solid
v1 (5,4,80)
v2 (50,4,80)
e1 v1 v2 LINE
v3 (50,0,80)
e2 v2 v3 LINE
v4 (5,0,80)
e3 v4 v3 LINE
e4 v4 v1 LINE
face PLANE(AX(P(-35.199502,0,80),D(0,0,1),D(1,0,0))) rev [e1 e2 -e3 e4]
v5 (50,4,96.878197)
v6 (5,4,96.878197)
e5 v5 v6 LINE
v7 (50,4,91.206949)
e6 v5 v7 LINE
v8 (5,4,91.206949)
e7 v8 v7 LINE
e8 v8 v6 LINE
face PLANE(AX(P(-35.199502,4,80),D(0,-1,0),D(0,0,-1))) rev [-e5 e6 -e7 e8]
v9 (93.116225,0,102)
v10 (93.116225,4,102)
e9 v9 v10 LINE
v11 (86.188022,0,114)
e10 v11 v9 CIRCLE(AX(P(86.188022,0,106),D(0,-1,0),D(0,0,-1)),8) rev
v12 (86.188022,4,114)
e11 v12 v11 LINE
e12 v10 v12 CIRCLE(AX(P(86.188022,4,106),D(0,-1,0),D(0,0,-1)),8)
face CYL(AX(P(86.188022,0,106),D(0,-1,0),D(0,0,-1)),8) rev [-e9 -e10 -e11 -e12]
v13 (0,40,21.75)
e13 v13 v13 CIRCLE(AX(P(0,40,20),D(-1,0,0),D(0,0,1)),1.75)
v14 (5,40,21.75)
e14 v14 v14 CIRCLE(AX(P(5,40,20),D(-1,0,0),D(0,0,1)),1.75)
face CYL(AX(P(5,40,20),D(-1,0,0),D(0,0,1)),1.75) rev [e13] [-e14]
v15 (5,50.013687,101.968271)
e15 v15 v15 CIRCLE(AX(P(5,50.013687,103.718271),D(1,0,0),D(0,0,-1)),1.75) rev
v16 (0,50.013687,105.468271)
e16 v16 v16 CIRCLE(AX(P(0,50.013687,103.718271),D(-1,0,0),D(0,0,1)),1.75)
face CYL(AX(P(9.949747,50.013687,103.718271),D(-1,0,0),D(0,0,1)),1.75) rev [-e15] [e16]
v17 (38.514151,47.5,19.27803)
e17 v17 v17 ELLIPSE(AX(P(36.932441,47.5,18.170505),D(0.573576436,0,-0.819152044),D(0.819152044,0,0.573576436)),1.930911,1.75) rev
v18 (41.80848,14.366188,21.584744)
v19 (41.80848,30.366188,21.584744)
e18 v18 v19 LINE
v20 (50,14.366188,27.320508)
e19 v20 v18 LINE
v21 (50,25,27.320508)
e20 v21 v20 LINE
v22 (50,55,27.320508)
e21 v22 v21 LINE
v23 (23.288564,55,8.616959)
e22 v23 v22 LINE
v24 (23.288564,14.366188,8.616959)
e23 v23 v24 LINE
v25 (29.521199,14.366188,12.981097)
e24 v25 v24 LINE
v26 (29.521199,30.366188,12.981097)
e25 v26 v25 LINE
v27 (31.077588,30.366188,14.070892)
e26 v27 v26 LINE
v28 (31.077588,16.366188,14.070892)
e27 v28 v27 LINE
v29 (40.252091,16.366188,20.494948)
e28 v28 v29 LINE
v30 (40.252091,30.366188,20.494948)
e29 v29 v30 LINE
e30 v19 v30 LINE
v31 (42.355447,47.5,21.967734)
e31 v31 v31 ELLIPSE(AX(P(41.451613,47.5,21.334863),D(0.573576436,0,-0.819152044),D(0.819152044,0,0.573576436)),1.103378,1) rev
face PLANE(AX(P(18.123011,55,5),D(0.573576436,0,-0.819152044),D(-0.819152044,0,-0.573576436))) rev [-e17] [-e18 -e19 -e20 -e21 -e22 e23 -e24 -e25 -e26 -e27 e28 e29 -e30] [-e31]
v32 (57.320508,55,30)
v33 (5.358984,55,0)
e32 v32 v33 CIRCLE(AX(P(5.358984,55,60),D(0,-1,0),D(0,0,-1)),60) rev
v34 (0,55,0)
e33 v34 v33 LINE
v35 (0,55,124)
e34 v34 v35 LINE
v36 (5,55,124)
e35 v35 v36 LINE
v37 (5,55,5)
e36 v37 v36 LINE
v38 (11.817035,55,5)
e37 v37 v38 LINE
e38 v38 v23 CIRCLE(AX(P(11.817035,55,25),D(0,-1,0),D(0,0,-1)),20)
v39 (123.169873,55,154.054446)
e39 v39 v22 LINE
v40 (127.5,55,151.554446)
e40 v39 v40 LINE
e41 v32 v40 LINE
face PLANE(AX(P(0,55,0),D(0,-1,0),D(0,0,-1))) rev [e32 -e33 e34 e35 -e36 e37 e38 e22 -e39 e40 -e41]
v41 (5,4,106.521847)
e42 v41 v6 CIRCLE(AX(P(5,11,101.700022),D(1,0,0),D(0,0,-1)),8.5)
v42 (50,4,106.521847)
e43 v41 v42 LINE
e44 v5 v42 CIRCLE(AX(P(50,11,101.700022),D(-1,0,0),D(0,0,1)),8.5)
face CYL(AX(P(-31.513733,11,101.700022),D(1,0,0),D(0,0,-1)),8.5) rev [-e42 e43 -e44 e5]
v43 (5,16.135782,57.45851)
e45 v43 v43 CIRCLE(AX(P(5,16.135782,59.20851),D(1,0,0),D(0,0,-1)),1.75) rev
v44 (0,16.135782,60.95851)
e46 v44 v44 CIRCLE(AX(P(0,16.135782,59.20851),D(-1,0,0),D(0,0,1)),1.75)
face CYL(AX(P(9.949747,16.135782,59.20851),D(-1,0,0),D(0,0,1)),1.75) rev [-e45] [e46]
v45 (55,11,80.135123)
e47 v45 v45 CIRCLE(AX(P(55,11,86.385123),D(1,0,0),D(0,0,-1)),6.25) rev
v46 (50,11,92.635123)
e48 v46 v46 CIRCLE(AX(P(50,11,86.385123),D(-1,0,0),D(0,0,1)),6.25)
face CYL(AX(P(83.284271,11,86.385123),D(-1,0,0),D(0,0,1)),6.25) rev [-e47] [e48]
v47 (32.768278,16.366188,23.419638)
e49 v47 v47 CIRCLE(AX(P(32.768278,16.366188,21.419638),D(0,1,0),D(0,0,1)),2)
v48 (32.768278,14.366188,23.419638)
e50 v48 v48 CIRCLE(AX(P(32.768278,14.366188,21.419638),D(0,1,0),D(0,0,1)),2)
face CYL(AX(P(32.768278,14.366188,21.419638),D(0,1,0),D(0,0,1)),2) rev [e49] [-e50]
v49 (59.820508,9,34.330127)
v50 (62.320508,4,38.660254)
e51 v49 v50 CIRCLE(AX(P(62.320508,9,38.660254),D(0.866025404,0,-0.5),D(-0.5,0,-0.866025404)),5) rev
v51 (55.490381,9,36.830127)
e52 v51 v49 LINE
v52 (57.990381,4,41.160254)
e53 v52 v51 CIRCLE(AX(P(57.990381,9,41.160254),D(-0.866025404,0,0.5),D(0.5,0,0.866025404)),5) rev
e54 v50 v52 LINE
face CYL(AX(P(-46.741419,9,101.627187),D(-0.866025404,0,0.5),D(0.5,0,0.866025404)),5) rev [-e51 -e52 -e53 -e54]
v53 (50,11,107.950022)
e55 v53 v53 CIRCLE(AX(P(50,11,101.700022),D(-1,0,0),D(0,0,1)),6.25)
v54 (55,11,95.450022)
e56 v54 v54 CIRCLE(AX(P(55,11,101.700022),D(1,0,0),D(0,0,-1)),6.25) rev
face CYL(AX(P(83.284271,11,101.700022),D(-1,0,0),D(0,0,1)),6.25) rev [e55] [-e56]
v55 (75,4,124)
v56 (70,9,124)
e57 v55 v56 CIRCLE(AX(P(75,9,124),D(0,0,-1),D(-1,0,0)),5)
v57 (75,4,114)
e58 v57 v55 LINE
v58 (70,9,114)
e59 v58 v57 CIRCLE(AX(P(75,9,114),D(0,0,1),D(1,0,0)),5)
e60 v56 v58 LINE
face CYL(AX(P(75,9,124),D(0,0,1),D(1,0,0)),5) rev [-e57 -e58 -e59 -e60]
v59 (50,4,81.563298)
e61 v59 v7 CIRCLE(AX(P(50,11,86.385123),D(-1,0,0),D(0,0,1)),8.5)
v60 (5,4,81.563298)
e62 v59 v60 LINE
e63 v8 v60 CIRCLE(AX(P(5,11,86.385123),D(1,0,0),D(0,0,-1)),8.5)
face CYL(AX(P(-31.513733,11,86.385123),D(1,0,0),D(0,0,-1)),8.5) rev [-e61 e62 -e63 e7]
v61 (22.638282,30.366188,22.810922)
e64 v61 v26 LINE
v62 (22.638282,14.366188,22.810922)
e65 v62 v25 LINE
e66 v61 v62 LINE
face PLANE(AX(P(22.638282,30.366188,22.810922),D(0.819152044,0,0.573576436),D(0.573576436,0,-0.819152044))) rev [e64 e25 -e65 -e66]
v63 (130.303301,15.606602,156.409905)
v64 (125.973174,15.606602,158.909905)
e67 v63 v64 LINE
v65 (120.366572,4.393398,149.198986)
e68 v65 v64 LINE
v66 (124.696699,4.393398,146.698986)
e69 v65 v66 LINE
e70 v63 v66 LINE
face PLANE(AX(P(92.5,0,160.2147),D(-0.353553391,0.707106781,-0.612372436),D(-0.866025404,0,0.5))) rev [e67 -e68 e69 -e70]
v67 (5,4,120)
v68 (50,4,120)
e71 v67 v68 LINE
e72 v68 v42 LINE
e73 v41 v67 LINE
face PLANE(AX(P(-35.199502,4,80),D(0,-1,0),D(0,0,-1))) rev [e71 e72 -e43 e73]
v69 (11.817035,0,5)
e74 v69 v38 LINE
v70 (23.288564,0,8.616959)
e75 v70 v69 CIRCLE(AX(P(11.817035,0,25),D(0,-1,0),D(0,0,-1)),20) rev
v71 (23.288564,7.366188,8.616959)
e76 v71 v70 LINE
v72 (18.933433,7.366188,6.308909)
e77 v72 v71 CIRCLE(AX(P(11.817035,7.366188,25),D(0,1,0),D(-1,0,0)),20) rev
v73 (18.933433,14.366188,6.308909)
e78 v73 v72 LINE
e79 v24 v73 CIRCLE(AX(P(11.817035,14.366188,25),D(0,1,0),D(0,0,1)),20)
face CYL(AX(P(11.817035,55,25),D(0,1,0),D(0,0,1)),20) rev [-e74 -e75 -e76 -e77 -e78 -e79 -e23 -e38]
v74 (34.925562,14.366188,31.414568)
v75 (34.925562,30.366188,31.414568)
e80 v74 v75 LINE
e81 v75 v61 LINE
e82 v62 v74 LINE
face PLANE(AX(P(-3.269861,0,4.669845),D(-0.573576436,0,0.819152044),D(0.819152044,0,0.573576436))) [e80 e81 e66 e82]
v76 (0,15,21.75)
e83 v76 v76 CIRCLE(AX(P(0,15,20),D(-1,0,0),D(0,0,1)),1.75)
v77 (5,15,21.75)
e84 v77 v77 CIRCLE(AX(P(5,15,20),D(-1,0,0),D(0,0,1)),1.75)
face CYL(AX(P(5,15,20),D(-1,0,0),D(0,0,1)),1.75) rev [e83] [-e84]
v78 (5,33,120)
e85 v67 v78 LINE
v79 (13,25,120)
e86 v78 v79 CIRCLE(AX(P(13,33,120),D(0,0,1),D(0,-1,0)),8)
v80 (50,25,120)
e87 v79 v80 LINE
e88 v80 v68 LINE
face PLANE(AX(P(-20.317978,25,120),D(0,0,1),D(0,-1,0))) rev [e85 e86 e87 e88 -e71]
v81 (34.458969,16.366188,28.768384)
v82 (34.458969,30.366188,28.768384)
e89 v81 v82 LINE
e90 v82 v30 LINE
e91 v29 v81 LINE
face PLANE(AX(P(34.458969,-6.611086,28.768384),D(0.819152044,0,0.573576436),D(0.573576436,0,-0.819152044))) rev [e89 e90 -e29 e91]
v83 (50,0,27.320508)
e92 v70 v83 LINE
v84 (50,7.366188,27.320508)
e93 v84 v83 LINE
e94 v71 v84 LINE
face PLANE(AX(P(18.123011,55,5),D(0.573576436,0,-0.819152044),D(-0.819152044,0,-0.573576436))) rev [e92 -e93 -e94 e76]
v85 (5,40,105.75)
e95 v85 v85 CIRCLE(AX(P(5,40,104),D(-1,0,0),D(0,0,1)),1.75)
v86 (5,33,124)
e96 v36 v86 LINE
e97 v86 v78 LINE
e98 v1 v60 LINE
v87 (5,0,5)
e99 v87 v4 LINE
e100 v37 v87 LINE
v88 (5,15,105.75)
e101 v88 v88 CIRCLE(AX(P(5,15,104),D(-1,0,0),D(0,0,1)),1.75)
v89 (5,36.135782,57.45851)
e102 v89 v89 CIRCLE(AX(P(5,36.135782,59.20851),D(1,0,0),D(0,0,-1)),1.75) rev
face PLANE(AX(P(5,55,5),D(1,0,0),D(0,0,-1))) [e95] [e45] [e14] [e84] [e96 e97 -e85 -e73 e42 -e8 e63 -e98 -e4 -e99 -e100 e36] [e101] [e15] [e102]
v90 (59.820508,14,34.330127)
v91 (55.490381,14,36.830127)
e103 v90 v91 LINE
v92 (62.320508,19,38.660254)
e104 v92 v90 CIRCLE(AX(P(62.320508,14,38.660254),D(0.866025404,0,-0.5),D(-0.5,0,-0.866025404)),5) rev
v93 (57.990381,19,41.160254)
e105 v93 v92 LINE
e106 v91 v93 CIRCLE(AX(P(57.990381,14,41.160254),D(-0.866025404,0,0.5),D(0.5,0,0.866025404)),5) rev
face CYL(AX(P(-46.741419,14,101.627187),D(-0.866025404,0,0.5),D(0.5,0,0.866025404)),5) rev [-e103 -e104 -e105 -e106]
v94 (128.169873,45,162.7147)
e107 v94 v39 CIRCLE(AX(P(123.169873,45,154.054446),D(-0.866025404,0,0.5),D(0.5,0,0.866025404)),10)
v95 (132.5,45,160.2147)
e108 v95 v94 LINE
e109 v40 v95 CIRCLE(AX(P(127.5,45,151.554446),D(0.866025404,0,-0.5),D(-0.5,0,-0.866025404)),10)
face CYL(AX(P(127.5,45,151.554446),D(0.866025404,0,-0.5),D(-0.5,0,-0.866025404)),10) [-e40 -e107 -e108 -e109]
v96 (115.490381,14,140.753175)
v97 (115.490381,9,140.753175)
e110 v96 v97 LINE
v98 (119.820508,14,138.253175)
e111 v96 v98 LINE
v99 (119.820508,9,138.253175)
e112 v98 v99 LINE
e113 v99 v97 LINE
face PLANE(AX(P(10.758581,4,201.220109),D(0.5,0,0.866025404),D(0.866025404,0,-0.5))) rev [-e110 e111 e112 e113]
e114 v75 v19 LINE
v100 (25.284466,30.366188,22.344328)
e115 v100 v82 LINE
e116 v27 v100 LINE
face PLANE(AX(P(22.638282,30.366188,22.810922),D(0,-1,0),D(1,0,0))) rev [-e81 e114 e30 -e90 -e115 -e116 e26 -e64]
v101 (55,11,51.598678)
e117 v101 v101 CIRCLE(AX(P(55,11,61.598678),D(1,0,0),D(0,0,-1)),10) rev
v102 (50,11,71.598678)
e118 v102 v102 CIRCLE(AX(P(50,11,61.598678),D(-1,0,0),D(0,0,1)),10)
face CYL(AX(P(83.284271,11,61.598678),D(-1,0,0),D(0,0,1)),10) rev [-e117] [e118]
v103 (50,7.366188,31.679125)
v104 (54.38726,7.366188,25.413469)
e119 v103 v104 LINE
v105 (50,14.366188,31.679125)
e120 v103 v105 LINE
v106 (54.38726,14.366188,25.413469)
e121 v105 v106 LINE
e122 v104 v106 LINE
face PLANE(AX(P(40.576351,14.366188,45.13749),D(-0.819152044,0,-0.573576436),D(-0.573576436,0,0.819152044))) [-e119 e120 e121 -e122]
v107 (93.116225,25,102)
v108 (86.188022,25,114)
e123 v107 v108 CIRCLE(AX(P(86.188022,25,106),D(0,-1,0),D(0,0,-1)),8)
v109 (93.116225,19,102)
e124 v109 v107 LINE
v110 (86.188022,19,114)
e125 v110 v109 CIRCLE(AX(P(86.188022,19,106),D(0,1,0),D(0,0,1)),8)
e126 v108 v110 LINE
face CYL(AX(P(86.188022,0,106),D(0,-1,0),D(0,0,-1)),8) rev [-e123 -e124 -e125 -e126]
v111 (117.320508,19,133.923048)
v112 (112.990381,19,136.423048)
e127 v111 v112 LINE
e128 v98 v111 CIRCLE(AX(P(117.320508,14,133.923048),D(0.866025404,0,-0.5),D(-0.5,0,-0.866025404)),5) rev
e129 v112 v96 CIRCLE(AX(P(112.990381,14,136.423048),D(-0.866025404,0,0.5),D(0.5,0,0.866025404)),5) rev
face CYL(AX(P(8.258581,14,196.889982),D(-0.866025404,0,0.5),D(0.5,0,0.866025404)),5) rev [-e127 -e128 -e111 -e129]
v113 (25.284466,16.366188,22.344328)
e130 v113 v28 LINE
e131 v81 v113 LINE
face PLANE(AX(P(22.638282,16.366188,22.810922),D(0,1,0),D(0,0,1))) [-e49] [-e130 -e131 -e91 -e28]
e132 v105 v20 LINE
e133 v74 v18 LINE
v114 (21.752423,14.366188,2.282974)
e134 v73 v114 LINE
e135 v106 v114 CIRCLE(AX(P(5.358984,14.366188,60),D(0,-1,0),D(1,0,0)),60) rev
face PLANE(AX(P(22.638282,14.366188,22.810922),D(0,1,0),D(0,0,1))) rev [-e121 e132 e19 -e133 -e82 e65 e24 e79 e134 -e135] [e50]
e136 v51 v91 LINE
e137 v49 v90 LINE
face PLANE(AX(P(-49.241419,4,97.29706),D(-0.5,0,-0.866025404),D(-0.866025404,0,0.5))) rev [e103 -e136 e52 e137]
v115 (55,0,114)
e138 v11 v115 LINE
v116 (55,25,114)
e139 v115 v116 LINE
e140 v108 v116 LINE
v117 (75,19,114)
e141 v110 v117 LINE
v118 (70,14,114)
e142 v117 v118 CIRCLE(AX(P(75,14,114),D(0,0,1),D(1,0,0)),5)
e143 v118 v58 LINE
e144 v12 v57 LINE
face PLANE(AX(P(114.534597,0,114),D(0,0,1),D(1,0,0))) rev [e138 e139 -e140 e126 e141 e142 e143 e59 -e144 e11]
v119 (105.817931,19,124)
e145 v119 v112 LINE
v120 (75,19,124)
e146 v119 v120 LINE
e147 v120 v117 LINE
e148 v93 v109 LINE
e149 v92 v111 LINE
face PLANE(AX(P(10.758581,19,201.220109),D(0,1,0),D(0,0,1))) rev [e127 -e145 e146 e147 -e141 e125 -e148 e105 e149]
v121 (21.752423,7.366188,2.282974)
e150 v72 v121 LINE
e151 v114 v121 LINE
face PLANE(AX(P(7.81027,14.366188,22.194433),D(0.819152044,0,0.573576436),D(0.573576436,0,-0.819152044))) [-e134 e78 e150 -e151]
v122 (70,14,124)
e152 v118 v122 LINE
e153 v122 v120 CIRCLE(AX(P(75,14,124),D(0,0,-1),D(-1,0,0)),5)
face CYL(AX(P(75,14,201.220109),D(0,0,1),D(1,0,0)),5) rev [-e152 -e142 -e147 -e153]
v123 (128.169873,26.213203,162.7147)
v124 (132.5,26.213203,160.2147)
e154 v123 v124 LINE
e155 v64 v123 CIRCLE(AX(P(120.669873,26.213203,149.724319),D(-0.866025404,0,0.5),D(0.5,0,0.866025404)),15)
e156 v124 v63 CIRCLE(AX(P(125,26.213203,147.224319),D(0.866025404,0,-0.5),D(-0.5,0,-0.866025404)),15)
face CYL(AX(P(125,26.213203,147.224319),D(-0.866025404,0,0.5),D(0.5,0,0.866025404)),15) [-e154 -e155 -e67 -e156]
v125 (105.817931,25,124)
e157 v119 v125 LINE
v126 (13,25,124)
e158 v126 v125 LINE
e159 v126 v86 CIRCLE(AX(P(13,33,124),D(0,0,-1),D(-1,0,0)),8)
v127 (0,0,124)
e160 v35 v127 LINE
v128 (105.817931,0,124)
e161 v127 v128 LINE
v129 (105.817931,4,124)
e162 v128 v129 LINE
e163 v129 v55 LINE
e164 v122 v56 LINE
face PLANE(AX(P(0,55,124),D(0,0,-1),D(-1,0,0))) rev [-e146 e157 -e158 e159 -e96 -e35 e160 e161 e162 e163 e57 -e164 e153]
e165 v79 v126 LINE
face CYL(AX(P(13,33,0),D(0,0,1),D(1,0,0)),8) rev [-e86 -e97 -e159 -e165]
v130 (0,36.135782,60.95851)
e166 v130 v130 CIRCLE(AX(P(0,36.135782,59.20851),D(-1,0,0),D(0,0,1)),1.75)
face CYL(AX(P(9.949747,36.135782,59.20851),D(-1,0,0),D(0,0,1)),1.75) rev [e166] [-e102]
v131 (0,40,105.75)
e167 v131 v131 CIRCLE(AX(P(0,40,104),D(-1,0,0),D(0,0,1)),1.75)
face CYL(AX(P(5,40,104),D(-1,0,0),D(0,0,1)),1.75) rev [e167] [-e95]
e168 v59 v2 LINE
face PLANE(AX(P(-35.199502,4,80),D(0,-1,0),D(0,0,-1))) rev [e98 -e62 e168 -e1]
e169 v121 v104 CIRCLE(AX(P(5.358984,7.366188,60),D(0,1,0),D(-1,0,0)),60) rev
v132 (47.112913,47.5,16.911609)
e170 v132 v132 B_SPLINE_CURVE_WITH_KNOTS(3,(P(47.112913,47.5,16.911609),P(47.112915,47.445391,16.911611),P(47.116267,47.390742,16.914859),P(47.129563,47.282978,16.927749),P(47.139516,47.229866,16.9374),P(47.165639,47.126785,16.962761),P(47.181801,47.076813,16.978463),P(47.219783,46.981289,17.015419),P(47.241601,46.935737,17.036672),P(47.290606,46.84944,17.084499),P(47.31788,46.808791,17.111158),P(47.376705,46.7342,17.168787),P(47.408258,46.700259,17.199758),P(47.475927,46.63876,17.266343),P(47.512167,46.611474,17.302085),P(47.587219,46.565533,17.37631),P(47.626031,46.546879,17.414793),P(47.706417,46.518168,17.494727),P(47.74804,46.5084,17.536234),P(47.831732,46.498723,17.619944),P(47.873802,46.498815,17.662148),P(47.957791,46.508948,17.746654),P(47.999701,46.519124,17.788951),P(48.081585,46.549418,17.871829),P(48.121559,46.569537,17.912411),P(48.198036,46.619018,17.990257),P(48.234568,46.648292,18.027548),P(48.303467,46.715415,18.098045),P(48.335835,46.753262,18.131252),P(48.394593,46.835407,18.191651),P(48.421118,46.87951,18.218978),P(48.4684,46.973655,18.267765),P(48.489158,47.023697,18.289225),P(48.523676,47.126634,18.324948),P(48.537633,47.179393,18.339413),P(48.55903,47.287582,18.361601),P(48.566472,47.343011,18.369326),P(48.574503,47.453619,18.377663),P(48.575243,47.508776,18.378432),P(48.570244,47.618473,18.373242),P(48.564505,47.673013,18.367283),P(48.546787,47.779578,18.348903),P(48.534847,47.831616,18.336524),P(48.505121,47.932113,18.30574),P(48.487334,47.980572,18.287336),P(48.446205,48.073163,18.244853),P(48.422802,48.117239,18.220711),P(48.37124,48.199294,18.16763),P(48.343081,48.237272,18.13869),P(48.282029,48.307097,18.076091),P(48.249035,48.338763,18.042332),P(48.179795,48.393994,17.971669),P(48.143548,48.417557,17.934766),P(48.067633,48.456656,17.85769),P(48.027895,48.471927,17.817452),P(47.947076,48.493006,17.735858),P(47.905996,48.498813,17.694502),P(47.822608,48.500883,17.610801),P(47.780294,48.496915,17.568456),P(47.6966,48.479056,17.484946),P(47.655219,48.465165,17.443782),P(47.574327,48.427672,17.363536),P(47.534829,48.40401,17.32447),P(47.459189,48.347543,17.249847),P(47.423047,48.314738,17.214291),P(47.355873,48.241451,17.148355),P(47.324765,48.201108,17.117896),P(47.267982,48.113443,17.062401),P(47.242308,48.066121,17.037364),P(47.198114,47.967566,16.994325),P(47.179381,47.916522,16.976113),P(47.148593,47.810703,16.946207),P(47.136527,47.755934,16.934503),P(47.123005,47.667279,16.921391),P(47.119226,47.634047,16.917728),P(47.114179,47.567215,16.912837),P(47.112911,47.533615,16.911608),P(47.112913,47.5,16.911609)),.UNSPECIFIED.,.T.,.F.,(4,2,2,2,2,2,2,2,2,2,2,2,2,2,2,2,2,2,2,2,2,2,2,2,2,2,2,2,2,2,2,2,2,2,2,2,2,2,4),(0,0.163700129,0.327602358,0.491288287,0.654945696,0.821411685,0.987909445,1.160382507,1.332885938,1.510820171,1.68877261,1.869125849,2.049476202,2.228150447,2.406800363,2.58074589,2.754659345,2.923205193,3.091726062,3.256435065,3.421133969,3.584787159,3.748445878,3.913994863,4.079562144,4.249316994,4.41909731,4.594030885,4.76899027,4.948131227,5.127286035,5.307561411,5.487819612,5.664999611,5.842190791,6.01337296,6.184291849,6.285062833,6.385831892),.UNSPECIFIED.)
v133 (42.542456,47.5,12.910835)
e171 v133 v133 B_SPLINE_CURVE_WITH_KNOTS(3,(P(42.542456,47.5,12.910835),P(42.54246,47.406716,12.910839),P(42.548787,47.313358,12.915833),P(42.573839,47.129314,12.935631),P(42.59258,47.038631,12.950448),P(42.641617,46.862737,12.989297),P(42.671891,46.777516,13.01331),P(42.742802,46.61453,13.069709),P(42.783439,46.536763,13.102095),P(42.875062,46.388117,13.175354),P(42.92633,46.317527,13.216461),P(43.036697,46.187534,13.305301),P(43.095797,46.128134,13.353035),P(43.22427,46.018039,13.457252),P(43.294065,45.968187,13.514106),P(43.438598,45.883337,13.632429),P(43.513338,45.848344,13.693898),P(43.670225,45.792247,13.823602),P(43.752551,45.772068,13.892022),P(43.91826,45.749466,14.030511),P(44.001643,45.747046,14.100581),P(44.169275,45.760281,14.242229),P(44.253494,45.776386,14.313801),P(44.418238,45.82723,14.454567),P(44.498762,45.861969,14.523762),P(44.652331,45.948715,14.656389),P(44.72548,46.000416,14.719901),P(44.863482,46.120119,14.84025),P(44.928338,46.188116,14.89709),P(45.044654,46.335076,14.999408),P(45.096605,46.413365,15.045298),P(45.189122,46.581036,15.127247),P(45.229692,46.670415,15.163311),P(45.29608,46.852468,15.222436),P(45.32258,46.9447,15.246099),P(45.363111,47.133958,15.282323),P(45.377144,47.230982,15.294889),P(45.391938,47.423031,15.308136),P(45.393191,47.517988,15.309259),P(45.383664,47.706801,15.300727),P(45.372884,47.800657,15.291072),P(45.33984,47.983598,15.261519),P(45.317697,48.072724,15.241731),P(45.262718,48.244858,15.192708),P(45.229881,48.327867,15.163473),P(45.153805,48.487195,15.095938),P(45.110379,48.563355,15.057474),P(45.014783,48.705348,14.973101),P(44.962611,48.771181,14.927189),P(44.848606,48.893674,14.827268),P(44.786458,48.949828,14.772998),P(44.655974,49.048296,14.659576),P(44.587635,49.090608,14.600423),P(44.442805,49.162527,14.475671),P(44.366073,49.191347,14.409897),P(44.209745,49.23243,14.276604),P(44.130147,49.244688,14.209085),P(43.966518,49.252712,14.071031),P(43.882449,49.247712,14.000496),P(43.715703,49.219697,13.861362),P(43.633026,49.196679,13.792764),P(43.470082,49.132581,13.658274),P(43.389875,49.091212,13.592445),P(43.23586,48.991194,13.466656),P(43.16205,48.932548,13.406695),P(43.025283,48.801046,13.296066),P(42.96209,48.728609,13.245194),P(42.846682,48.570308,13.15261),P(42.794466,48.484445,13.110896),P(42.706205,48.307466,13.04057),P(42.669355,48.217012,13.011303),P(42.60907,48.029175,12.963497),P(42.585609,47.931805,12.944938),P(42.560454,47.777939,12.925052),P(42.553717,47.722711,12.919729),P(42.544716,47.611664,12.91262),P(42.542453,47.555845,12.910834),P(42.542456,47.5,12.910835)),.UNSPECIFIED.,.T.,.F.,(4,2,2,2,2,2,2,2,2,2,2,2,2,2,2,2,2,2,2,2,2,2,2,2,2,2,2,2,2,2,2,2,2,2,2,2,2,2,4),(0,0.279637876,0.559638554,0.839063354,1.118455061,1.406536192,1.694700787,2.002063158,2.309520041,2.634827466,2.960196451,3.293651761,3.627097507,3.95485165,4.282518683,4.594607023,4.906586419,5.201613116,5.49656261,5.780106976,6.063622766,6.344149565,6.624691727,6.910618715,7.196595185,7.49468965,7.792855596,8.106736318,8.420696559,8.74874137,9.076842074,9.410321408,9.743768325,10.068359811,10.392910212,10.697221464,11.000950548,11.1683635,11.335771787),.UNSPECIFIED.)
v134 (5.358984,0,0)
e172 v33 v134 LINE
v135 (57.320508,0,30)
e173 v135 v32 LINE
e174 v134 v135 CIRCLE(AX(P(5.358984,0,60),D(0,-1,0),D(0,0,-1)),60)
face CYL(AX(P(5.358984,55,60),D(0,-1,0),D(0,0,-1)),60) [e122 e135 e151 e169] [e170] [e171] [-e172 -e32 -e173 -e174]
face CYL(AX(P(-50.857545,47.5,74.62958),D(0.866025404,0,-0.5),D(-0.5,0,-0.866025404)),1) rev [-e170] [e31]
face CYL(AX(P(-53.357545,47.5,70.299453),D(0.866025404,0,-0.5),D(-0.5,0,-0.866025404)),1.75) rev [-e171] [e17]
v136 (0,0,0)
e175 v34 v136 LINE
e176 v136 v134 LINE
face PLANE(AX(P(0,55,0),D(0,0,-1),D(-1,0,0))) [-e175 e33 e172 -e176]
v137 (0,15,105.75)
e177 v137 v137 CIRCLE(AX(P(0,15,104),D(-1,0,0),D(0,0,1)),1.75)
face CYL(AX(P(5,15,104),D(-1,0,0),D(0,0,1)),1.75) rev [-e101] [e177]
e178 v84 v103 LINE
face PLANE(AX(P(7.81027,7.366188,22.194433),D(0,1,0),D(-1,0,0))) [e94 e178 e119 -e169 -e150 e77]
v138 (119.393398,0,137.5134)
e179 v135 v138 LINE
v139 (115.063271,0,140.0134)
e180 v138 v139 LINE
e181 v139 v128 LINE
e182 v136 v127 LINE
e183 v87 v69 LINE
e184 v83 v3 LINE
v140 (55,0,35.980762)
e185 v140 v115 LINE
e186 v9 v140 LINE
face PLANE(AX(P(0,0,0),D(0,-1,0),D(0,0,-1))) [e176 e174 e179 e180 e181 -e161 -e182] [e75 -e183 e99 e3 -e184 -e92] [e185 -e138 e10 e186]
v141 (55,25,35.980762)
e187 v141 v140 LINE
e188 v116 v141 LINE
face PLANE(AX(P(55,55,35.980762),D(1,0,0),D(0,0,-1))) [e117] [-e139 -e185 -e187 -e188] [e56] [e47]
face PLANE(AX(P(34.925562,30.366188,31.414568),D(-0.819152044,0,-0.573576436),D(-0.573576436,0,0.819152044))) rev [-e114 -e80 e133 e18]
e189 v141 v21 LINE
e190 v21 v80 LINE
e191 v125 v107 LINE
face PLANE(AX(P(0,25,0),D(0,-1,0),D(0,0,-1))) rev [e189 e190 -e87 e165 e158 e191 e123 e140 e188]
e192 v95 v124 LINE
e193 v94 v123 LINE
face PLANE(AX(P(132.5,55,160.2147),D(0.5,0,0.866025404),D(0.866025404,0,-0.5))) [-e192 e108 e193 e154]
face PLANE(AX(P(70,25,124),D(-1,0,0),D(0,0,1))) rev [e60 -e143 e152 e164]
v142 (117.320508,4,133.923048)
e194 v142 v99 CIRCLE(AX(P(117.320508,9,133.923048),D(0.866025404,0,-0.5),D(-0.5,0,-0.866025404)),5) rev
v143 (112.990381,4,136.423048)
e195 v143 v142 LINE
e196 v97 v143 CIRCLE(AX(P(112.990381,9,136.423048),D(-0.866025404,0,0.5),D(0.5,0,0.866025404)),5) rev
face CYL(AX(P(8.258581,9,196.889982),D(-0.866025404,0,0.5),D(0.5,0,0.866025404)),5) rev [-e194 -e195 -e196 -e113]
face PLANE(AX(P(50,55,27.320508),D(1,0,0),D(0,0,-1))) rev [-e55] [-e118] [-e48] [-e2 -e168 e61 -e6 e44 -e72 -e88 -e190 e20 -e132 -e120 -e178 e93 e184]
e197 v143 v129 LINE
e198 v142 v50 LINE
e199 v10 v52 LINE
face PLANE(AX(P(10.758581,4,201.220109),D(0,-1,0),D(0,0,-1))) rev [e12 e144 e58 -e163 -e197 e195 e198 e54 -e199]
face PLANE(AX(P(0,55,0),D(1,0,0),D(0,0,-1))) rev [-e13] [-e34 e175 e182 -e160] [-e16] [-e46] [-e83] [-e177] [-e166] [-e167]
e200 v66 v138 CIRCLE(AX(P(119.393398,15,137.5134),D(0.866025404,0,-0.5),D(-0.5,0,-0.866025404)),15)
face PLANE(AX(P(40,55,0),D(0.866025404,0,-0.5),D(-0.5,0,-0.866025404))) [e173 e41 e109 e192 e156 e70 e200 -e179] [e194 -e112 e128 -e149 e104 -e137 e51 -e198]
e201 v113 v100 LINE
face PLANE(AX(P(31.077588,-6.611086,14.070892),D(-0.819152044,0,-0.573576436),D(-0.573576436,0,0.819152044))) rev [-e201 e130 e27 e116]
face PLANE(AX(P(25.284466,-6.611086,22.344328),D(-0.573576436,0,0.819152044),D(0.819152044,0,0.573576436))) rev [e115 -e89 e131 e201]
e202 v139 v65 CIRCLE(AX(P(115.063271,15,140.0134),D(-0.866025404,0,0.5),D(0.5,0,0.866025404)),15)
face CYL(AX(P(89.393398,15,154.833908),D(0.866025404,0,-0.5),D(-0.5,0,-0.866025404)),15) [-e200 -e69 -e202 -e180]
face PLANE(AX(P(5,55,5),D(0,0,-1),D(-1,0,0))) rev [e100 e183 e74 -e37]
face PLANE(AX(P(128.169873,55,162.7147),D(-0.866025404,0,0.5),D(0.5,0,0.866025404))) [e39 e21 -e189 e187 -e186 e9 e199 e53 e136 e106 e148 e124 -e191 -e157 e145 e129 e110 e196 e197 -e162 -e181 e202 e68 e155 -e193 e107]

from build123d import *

# Parameters (mm, degrees)
BOSS_EXTRUDE3_DEPTH     = 55
FILLET1_R               = 60
SKETCH4_W               = 15
SKETCH4_H               = 16
BOSS_EXTRUDE4_DEPTH     = 12
CUT_EXTRUDE1_DEPTH      = 20
CUT_EXTRUDE1_DEPTH_BACK = 14
SKETCH5_W               = 40
SKETCH5_H               = 7
CUT_EXTRUDE2_DEPTH      = 14
SKETCH7_R               = 2
CUT_EXTRUDE3_DEPTH      = 2
CUT_EXTRUDE4_DEPTH      = 30
SKETCH9_R               = 10
SKETCH9_R_2             = 6.25
CUT_EXTRUDE5_DEPTH      = 5
SKETCH10_W              = 120
SKETCH10_H              = 15
CUT_EXTRUDE6_DEPTH      = 5
SKETCH11_W              = 4
SKETCH11_H              = 25
BOSS_EXTRUDE5_DEPTH     = 45
FILLET3_R               = 20
BOSS_EXTRUDE6_REACH     = 190.434
SKETCH12_W              = 10
SKETCH12_H              = 4
SKETCH13_W              = 40
SKETCH13_H              = 4
BOSS_EXTRUDE7_DEPTH     = 45
FILLET4_R               = 5
CUT_EXTRUDE7_DEPTH      = 45
SKETCH16_R              = 1.75
CUT_EXTRUDE8_DEPTH      = 5
SKETCH15_R              = 1.75
CUT_EXTRUDE9_DEPTH      = 5
CUT_EXTRUDE10_REACH     = 216.345
SKETCH17_R              = 1.75
SKETCH17_R_2            = 1
CHAMFER1_SIZE           = 20
FILLET6_R               = 15
FILLET7_R               = 10
SKETCH18_W              = 15
SKETCH18_H              = 10
BOSS_EXTRUDE8_DEPTH     = 21
SKETCH19_W              = 10
SKETCH19_H              = 6
BOSS_EXTRUDE9_DEPTH     = 35.817931
FILLET9_R               = 5
FILLET10_R              = 8
FILLET11_R              = 8


with BuildPart() as part:
    # Sketch3 → Boss-Extrude3 (new body)
    with BuildSketch(Plane(origin=(0, 0, 0), x_dir=(1, 0, 0), z_dir=(0, 1, 0))):
        Polygon((128.169872981, -162.7146997), (55, -35.980762114), (55, -124), (50, -124), (50, -27.320508076), (18.123010882, -5), (5, -5), (5, -124), (0, -124), (0, 0), (40, 0), (132.5, -160.2146997), align=None)
    extrude(amount=BOSS_EXTRUDE3_DEPTH)

    # Fillet1
    fillet1_edges = [part.edges().sort_by_distance(p)[0] for p in [
        (40, 27.5, 0),
    ]]
    fillet(fillet1_edges, radius=FILLET1_R)

    # Sketch4 → Boss-Extrude4 (add)
    with BuildSketch(Plane(origin=(3.613056499, 0, -5.159979438), x_dir=(0.8191520442889911, 0, 0.5735764363510469), z_dir=(-0.5735764363510469, 0, 0.8191520442889911))):
        with Locations((39.128001876, 22.366188336)):
            Rectangle(SKETCH4_W, SKETCH4_H)
    extrude(amount=BOSS_EXTRUDE4_DEPTH)

    # Sketch5 → Cut-Extrude1 (cut, two sides: drawn at the far end of the back side and taken through both)
    with BuildSketch(Plane(origin=(3.613056499, 0, -5.159979438), x_dir=(0.8191520442889911, 0, 0.5735764363510469), z_dir=(-0.5735764363510469, 0, 0.8191520442889911)).offset(-CUT_EXTRUDE1_DEPTH_BACK)):
        with Locations((39.128001876, 10.866188336)):
            Rectangle(SKETCH5_W, SKETCH5_H)
    extrude(amount=CUT_EXTRUDE1_DEPTH + CUT_EXTRUDE1_DEPTH_BACK, mode=Mode.SUBTRACT)

    # Sketch6 → Cut-Extrude2 (cut)
    with BuildSketch(Plane(origin=(0, 30.366188336, 0), x_dir=(1, 0, 0), z_dir=(0, 1, 0))):
        Polygon((31.077587777, -14.070892396), (25.28446577, -22.344328043), (34.458968666, -28.76838413), (40.252090673, -20.494948483), align=None)
    extrude(amount=-CUT_EXTRUDE2_DEPTH, mode=Mode.SUBTRACT)

    # Sketch7 → Cut-Extrude3 (cut)
    with BuildSketch(Plane(origin=(0, 16.366188336, 0), x_dir=(1, 0, 0), z_dir=(0, 1, 0))):
        with Locations(Location((32.768278221, -21.419638263, 0), (0, 0, 270))):
            Circle(SKETCH7_R)
    extrude(amount=-CUT_EXTRUDE3_DEPTH, mode=Mode.SUBTRACT)

    # Sketch8 → Cut-Extrude4 (cut)
    with BuildSketch(Plane(origin=(0, 55, 0), x_dir=(1, 0, 0), z_dir=(0, 1, 0))):
        Polygon((55, -35.980762114), (50, -27.320508076), (50, -124), (55, -124), align=None)
    extrude(amount=-CUT_EXTRUDE4_DEPTH, mode=Mode.SUBTRACT)

    # Sketch9 → Cut-Extrude5 (cut)
    with BuildSketch(Plane.ZY.offset(-50)):
        with Locations((61.598678321, 11)):
            Circle(SKETCH9_R)
        with Locations((86.385123427, 11)):
            Circle(SKETCH9_R_2)
        with Locations((101.700022006, 11)):
            Circle(SKETCH9_R_2)
    extrude(amount=-CUT_EXTRUDE5_DEPTH, mode=Mode.SUBTRACT)

    # Sketch10 → Cut-Extrude6 (cut)
    with BuildSketch(Plane(origin=(30, 0, -17.320508076), x_dir=(-0.5000000000000047, 0, -0.866025403784436), z_dir=(0.866025403784436, 0, -0.5000000000000047))):
        with Locations((-119.641016151, 11.5)):
            Rectangle(SKETCH10_W, SKETCH10_H)
    extrude(amount=-CUT_EXTRUDE6_DEPTH, mode=Mode.SUBTRACT)

    # Sketch11 → Boss-Extrude5 (add)
    with BuildSketch(Plane.ZY.offset(-50)):
        with Locations((122, 12.5)):
            Rectangle(SKETCH11_W, SKETCH11_H)
    extrude(amount=BOSS_EXTRUDE5_DEPTH)

    # Fillet3
    # the kernel refuses this fillet: 20 mm, written as the material it adds along each edge
    with BuildSketch(Plane(origin=(18.123010882, 0, 5), x_dir=(-1, 0, 0), z_dir=(0, 1, 0))) as fillet3_piece_1_section:
        with BuildLine():
            CenterArc((FILLET3_R * 0.315298788879, FILLET3_R), FILLET3_R, 235, 35)
            Line((-FILLET3_R * 0.258277647472, FILLET3_R * 0.180847955711), (0, 0))
            Line((0, 0), (FILLET3_R * 0.315298788879, 0))
        make_face()
    fillet3_piece_1 = extrude(amount=55, mode=Mode.PRIVATE)
    fillet3_piece_1 = split(fillet3_piece_1, bisect_by=Plane(origin=(18.647698148, 3.683094168, 6.716980636), z_dir=(-0.8191520442889912, 0, -0.5735764363510469)), keep=Keep.TOP, mode=Mode.PRIVATE)
    fillet3_piece_1 = split(fillet3_piece_1, bisect_by=Plane(origin=(16.403340896, 7.366188336, 5.14546477), z_dir=(0, -1, 0)), keep=Keep.TOP, mode=Mode.PRIVATE)
    add(fillet3_piece_1)
    with BuildSketch(Plane(origin=(18.123010882, 0, 5), x_dir=(-1, 0, 0), z_dir=(0, 1, 0))) as fillet3_piece_2_section:
        with BuildLine():
            CenterArc((FILLET3_R * 0.315298788879, FILLET3_R), FILLET3_R, 235, 35)
            Line((-FILLET3_R * 0.258277647472, FILLET3_R * 0.180847955711), (0, 0))
            Line((0, 0), (FILLET3_R * 0.315298788879, 0))
        make_face()
    fillet3_piece_2 = extrude(amount=55, mode=Mode.PRIVATE)
    fillet3_piece_2 = split(fillet3_piece_2, bisect_by=Plane(origin=(19.32323837, 3.683094168, 5.752209215), z_dir=(0.8191520442889912, 0, 0.5735764363510469)), keep=Keep.TOP, mode=Mode.PRIVATE)
    fillet3_piece_2 = split(fillet3_piece_2, bisect_by=Plane(origin=(20.990357579, 7.366188336, 6.919538653), z_dir=(0, -1, 0)), keep=Keep.TOP, mode=Mode.PRIVATE)
    add(fillet3_piece_2)
    with BuildSketch(Plane(origin=(18.123010882, 0, 5), x_dir=(-1, 0, 0), z_dir=(0, 1, 0))) as fillet3_piece_3_section:
        with BuildLine():
            CenterArc((FILLET3_R * 0.315298788879, FILLET3_R), FILLET3_R, 235, 35)
            Line((-FILLET3_R * 0.258277647472, FILLET3_R * 0.180847955711), (0, 0))
            Line((0, 0), (FILLET3_R * 0.315298788879, 0))
        make_face()
    fillet3_piece_3 = extrude(amount=55, mode=Mode.PRIVATE)
    fillet3_piece_3 = split(fillet3_piece_3, bisect_by=Plane(origin=(16.403340896, 14.366188336, 5.14546477), z_dir=(0, -1, 0)), keep=Keep.TOP, mode=Mode.PRIVATE)
    fillet3_piece_3 = split(fillet3_piece_3, bisect_by=Plane(origin=(18.647698148, 10.866188336, 6.716980636), z_dir=(-0.8191520442889912, 0, -0.5735764363510469)), keep=Keep.TOP, mode=Mode.PRIVATE)
    fillet3_piece_3 = split(fillet3_piece_3, bisect_by=Plane(origin=(16.403340896, 7.366188336, 5.14546477), z_dir=(0, 1, 0)), keep=Keep.TOP, mode=Mode.PRIVATE)
    add(fillet3_piece_3)
    with BuildSketch(Plane(origin=(18.123010882, 0, 5), x_dir=(-1, 0, 0), z_dir=(0, 1, 0))) as fillet3_piece_4_section:
        with BuildLine():
            CenterArc((FILLET3_R * 0.315298788879, FILLET3_R), FILLET3_R, 235, 35)
            Line((-FILLET3_R * 0.258277647472, FILLET3_R * 0.180847955711), (0, 0))
            Line((0, 0), (FILLET3_R * 0.315298788879, 0))
        make_face()
    fillet3_piece_4 = extrude(amount=55, mode=Mode.PRIVATE)
    fillet3_piece_4 = split(fillet3_piece_4, bisect_by=Plane(origin=(16.403340896, 14.366188336, 5.14546477), z_dir=(0, 1, 0)), keep=Keep.TOP, mode=Mode.PRIVATE)
    fillet3_piece_4 = split(fillet3_piece_4, bisect_by=Plane(origin=(18.647698148, 34.683094168, 6.716980636), z_dir=(-0.8191520442889912, 0, -0.5735764363510469)), keep=Keep.TOP, mode=Mode.PRIVATE)
    add(fillet3_piece_4)
    with BuildSketch(Plane(origin=(18.123010882, 0, 5), x_dir=(-1, 0, 0), z_dir=(0, 1, 0))) as fillet3_piece_5_section:
        with BuildLine():
            CenterArc((FILLET3_R * 0.315298788879, FILLET3_R), FILLET3_R, 235, 35)
            Line((-FILLET3_R * 0.258277647472, FILLET3_R * 0.180847955711), (0, 0))
            Line((0, 0), (FILLET3_R * 0.315298788879, 0))
        make_face()
    fillet3_piece_5 = extrude(amount=55, mode=Mode.PRIVATE)
    fillet3_piece_5 = split(fillet3_piece_5, bisect_by=Plane(origin=(20.990357579, 14.366188336, 6.919538653), z_dir=(0, 1, 0)), keep=Keep.TOP, mode=Mode.PRIVATE)
    fillet3_piece_5 = split(fillet3_piece_5, bisect_by=Plane(origin=(19.32323837, 34.683094168, 5.752209215), z_dir=(0.8191520442889912, 0, 0.5735764363510469)), keep=Keep.TOP, mode=Mode.PRIVATE)
    add(fillet3_piece_5)

    # Boss-Extrude6: up to this plane
    boss_extrude6_end = Plane(origin=(128.169872981, 55, 162.7146997), z_dir=(-0.8660254037844362, 0, 0.5000000000000044))
    # Sketch12 → Boss-Extrude6 (add, up to the surface)
    with BuildSketch(Plane(origin=(55, 0, 0), x_dir=(0, 0, -1), z_dir=(1, 0, 0)), mode=Mode.PRIVATE) as boss_extrude6_sk1:
        with Locations((-119, 2)):
            Rectangle(SKETCH12_W, SKETCH12_H)
    boss_extrude6_tool1 = split(extrude(boss_extrude6_sk1.sketch, amount=BOSS_EXTRUDE6_REACH, mode=Mode.PRIVATE), bisect_by=boss_extrude6_end, keep=Keep.BOTH, mode=Mode.PRIVATE)
    add(boss_extrude6_tool1.solids().sort_by_distance((55, 2, 119))[0])

    # Sketch13 → Boss-Extrude7 (add)
    with BuildSketch(Plane.ZY.offset(-50)):
        with Locations((100, 2)):
            Rectangle(SKETCH13_W, SKETCH13_H)
    extrude(amount=BOSS_EXTRUDE7_DEPTH)

    # Fillet4
    fillet4_edges = [part.edges().sort_by_distance(p)[0] for p in [
        (57.655444566, 4, 35.580127019),
        (57.655444566, 19, 35.580127019),
        (117.655444566, 19, 139.503175473),
        (117.655444566, 4, 139.503175473),
    ]]
    fillet(fillet4_edges, radius=FILLET4_R)

    # Sketch14 → Cut-Extrude7 (cut)
    with BuildSketch(Plane.ZY.offset(-50)):
        with BuildLine():
            ThreePointArc((94.042572717, 14.689643665), (77.885123427, 11), (94.042572717, 7.310356335))
            ThreePointArc((94.042572717, 7.310356335), (110.200022006, 11), (94.042572717, 14.689643665))
        make_face()
    extrude(amount=CUT_EXTRUDE7_DEPTH, mode=Mode.SUBTRACT)

    # Sketch16 → Cut-Extrude8 (cut)
    with BuildSketch(Plane.ZY):
        with Locations((59.208509529, 36.135781847)):
            Circle(SKETCH16_R)
        with Locations((59.208509529, 16.135781847)):
            Circle(SKETCH16_R)
        with Locations((103.718271361, 50.013687011)):
            Circle(SKETCH16_R)
    extrude(amount=-CUT_EXTRUDE8_DEPTH, mode=Mode.SUBTRACT)

    # Sketch15 → Cut-Extrude9 (cut)
    with BuildSketch(Plane.ZY):
        with Locations((104, 40)):
            Circle(SKETCH15_R)
        with Locations((104, 15)):
            Circle(SKETCH15_R)
        with Locations((20, 15)):
            Circle(SKETCH15_R)
        with Locations((20, 40)):
            Circle(SKETCH15_R)
    extrude(amount=-CUT_EXTRUDE9_DEPTH, mode=Mode.SUBTRACT)

    # Cut-Extrude10: up to this plane
    cut_extrude10_end = Plane(origin=(18.123010882, 55, 5), z_dir=(0.5735764363510469, 0, -0.8191520442889914))
    # Sketch17 → Cut-Extrude10 (cut, up to the surface)
    with BuildSketch(Plane(origin=(30, 0, -17.320508076), x_dir=(-0.5000000000000047, 0, -0.866025403784436), z_dir=(0.866025403784436, 0, -0.5000000000000047)), mode=Mode.PRIVATE) as cut_extrude10_sk1:
        with Locations((-34.202339372, 47.5)):
            Circle(SKETCH17_R)
    cut_extrude10_tool1 = split(extrude(cut_extrude10_sk1.sketch, amount=-CUT_EXTRUDE10_REACH, mode=Mode.PRIVATE), bisect_by=cut_extrude10_end, keep=Keep.BOTH, mode=Mode.PRIVATE)
    add(cut_extrude10_tool1.solids().sort_by_distance((47.10117, 47.5, 12.299587))[0], mode=Mode.SUBTRACT)
    # Sketch17 → Cut-Extrude10 (cut, up to the surface)
    with BuildSketch(Plane(origin=(30, 0, -17.320508076), x_dir=(-0.5000000000000047, 0, -0.866025403784436), z_dir=(0.866025403784436, 0, -0.5000000000000047)), mode=Mode.PRIVATE) as cut_extrude10_sk2:
        with Locations((-39.202339372, 47.5)):
            Circle(SKETCH17_R_2)
    cut_extrude10_tool2 = split(extrude(cut_extrude10_sk2.sketch, amount=-CUT_EXTRUDE10_REACH, mode=Mode.PRIVATE), bisect_by=cut_extrude10_end, keep=Keep.BOTH, mode=Mode.PRIVATE)
    add(cut_extrude10_tool2.solids().sort_by_distance((49.60117, 47.5, 16.629714))[0], mode=Mode.SUBTRACT)

    # Chamfer1
    chamfer1_edges = [part.edges().sort_by_distance(p)[0] for p in [
        (130.334936491, 0, 161.4646997),
    ]]
    chamfer(chamfer1_edges, length=CHAMFER1_SIZE)

    # Fillet6
    fillet6_edges = [part.edges().sort_by_distance(p)[0] for p in [
        (120.334936491, 0, 144.144191624),
        (130.334936491, 20, 161.4646997),
    ]]
    fillet(fillet6_edges, radius=FILLET6_R)

    # Fillet7
    fillet7_edges = [part.edges().sort_by_distance(p)[0] for p in [
        (130.334936491, 55, 161.4646997),
    ]]
    fillet(fillet7_edges, radius=FILLET7_R)

    # Sketch18 → Boss-Extrude8 (add)
    with BuildSketch(Plane(origin=(0, 4, 0), x_dir=(1, 0, 0), z_dir=(0, 1, 0))):
        with Locations((62.5, -119)):
            Rectangle(SKETCH18_W, SKETCH18_H)
    extrude(amount=BOSS_EXTRUDE8_DEPTH)

    # Sketch19 → Boss-Extrude9 (add)
    with BuildSketch(Plane(origin=(70, 0, 0), x_dir=(0, 0, -1), z_dir=(1, 0, 0))):
        with Locations((-119, 22)):
            Rectangle(SKETCH19_W, SKETCH19_H)
    extrude(amount=BOSS_EXTRUDE9_DEPTH)

    # Fillet9
    fillet9_edges = [part.edges().sort_by_distance(p)[0] for p in [
        (70, 4, 119),
        (70, 19, 119),
    ]]
    fillet(fillet9_edges, radius=FILLET9_R)

    # Fillet10
    fillet10_edges = [part.edges().sort_by_distance(p)[0] for p in [
        (100.044427996, 2, 114),
        (100.044427996, 22, 114),
    ]]
    fillet(fillet10_edges, radius=FILLET10_R)

    # Fillet11
    fillet11_edges = [part.edges().sort_by_distance(p)[0] for p in [
        (5, 25, 122),
    ]]
    fillet(fillet11_edges, radius=FILLET11_R)


solid = part.part
